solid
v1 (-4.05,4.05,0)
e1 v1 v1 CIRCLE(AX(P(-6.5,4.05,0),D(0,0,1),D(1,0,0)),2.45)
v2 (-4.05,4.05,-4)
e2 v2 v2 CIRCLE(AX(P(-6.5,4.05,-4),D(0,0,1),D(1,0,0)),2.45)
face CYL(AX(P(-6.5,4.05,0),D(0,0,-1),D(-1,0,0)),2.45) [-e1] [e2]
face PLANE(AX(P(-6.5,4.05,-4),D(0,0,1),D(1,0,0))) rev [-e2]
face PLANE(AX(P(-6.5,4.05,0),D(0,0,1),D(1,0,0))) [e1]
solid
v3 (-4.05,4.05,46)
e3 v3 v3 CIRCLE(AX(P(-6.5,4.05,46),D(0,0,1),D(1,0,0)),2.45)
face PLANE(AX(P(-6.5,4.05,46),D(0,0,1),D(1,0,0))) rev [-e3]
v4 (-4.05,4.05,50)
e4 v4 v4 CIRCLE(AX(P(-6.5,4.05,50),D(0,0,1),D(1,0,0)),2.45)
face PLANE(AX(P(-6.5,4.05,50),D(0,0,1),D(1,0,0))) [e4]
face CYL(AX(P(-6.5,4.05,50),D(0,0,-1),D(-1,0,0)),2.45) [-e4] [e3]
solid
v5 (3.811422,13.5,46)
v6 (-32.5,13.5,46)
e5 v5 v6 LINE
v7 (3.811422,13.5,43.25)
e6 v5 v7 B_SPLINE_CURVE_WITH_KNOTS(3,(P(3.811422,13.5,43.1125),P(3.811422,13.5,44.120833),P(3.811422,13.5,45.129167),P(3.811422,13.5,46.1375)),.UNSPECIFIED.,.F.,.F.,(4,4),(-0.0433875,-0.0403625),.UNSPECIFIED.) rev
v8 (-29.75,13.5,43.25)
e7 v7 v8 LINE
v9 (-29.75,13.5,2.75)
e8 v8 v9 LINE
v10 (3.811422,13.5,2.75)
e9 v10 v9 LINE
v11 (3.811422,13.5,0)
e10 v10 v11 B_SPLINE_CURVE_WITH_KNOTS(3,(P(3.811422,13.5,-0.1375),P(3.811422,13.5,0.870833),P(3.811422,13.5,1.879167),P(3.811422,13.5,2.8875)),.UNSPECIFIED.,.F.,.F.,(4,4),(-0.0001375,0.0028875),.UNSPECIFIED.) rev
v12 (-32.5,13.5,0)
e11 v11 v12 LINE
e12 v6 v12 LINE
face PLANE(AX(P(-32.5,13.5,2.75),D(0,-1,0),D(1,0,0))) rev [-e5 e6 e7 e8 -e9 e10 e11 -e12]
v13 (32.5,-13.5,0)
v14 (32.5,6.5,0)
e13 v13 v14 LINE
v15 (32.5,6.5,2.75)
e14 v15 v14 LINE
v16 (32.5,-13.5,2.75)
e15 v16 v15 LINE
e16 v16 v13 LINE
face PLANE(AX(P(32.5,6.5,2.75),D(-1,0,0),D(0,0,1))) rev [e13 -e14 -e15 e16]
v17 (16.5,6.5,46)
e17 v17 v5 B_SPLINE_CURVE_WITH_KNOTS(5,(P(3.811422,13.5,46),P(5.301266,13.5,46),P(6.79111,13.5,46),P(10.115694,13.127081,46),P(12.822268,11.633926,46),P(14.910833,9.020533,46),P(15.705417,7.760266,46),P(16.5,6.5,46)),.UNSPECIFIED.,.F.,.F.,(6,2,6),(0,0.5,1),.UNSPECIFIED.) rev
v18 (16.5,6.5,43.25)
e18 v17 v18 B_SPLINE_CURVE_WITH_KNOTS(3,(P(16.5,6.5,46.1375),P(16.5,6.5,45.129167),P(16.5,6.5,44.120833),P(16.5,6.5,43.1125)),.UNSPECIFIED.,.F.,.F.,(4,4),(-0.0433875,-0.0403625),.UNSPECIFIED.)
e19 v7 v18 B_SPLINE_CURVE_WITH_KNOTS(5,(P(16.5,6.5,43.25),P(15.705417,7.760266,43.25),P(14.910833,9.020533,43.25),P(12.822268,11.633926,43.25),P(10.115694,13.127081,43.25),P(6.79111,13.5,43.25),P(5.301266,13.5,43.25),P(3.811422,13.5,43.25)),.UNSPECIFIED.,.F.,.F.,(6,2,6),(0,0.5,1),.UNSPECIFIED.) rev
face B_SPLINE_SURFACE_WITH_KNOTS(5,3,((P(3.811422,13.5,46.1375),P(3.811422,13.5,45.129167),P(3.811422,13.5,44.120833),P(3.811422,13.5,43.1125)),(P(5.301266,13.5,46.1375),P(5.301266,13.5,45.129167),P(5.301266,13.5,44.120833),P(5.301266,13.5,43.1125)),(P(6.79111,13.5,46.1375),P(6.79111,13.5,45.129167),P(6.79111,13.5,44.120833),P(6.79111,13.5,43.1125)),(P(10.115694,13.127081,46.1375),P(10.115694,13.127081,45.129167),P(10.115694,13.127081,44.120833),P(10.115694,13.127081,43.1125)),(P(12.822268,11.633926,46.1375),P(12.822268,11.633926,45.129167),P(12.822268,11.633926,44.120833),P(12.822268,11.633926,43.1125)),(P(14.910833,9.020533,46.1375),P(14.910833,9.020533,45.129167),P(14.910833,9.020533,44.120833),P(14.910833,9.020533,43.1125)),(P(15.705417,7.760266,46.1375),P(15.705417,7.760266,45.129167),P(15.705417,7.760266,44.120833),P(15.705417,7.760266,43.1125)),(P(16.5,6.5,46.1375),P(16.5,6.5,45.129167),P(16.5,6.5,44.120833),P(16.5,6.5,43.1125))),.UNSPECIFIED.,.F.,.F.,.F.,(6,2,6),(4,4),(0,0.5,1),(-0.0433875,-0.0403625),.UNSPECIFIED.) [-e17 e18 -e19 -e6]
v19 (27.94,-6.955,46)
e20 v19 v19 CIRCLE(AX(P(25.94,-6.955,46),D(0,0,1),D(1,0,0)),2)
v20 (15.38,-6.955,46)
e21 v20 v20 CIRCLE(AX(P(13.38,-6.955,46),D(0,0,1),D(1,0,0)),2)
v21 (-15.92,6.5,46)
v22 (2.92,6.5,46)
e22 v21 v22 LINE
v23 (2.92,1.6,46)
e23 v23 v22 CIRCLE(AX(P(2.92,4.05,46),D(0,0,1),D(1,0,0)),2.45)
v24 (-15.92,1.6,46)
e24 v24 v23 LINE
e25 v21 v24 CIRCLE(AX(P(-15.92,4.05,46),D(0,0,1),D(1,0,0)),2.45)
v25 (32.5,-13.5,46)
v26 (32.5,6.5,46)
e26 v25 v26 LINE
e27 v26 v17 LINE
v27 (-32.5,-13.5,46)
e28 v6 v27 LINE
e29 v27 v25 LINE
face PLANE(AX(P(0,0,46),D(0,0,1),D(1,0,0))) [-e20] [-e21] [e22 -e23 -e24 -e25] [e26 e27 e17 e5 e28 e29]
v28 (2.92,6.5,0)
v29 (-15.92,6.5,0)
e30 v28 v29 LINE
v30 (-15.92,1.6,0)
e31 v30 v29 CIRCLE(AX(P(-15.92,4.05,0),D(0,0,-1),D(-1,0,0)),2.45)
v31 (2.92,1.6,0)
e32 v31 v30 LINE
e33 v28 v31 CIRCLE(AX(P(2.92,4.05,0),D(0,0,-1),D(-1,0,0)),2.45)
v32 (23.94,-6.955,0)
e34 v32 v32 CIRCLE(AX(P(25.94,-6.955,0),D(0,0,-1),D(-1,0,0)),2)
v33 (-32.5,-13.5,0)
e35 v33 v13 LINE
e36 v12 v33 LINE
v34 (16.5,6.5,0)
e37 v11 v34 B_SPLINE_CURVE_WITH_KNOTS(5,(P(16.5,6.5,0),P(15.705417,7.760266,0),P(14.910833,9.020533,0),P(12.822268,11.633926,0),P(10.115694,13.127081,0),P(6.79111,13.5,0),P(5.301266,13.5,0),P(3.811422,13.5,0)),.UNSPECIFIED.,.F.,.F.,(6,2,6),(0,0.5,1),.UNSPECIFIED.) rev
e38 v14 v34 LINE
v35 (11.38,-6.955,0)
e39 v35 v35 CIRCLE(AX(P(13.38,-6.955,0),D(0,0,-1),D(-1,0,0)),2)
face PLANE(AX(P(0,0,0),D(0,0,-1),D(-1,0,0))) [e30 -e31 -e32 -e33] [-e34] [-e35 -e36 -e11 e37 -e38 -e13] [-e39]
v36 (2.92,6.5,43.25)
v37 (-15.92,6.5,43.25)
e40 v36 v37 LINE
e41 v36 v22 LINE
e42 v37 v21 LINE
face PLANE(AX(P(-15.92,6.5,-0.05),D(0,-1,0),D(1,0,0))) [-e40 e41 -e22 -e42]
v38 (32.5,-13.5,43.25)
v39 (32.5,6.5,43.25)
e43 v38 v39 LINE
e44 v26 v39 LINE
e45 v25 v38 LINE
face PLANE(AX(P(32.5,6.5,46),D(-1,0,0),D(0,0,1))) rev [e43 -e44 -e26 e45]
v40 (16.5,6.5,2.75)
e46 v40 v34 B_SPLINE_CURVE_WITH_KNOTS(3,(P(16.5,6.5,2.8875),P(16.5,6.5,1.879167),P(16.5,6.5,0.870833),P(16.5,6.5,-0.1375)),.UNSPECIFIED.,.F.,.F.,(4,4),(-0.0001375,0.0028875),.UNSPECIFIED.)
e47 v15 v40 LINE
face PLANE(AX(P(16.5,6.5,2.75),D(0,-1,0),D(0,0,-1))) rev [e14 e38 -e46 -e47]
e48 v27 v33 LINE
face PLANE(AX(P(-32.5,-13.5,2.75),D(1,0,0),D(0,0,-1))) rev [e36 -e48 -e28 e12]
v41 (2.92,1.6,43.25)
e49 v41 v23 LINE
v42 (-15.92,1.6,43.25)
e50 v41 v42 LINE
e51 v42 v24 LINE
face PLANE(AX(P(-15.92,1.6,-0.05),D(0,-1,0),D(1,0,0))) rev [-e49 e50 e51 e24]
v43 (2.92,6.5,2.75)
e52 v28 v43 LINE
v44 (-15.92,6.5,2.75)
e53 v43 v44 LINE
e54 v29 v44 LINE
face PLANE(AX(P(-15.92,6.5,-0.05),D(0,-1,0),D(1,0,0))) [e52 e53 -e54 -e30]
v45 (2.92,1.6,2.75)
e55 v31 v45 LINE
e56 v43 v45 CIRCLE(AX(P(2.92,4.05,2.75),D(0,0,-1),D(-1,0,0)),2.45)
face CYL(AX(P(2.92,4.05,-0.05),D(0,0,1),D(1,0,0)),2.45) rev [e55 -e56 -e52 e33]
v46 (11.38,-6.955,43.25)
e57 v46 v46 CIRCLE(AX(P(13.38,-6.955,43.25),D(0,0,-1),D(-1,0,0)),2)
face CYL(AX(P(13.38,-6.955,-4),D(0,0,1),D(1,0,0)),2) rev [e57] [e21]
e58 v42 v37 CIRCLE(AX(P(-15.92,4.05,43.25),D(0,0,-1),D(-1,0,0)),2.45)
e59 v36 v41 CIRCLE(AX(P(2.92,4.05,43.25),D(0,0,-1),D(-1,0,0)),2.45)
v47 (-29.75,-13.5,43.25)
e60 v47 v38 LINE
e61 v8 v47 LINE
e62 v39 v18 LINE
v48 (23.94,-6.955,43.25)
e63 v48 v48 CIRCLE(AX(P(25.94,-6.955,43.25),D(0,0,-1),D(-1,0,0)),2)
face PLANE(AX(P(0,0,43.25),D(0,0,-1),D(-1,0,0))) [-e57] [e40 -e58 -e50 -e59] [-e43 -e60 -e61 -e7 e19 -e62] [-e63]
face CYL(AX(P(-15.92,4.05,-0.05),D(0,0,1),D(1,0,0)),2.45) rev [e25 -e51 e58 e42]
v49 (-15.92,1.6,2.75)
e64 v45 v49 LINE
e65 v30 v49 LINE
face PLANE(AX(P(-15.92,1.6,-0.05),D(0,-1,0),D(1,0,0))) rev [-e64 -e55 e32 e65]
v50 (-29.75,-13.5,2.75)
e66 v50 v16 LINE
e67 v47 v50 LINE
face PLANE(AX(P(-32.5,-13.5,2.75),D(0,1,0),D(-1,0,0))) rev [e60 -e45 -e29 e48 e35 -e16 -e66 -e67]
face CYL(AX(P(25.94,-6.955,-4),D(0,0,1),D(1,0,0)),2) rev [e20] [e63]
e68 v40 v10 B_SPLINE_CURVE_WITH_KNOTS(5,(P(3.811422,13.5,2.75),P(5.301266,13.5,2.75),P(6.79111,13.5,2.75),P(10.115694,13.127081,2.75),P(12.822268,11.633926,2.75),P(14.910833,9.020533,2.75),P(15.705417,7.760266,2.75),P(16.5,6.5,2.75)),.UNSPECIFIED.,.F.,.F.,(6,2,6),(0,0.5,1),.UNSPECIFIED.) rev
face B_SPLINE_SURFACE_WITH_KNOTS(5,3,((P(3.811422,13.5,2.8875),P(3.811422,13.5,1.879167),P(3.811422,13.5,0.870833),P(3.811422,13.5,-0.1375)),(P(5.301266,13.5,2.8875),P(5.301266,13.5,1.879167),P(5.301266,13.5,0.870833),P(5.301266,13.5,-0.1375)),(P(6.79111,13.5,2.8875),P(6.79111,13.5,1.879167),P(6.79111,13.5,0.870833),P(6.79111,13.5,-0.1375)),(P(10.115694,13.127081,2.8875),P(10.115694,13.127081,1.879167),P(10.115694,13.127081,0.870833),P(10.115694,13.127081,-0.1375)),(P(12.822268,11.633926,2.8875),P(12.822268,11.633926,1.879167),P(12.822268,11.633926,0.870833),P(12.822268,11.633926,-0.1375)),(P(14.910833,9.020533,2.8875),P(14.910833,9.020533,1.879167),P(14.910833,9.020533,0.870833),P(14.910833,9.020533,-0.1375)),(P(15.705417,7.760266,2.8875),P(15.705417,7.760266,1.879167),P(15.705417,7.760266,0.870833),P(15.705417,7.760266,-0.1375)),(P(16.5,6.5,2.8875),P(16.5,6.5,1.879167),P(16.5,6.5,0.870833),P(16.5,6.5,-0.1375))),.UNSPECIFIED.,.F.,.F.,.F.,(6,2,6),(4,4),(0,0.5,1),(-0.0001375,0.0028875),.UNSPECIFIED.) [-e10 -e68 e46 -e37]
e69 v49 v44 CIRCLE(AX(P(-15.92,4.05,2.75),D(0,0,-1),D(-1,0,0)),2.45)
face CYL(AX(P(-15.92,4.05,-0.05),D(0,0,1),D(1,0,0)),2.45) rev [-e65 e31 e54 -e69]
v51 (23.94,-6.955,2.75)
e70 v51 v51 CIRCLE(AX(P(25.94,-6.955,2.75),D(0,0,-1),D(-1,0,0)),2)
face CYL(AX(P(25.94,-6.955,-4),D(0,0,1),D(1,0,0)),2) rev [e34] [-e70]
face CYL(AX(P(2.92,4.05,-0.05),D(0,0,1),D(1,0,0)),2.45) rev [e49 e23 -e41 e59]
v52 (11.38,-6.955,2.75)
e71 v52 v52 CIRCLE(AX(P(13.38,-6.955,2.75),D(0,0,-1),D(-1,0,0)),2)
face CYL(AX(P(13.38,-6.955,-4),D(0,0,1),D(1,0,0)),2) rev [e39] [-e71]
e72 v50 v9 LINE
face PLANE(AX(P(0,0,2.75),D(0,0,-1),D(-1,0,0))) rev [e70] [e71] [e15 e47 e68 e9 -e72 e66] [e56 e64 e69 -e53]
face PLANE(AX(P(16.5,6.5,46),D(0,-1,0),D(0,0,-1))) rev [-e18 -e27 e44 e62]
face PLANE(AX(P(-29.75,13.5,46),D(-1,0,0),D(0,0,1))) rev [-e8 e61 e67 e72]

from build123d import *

# Parameters (mm, degrees)
BOSS_EXTRUDE1_DEPTH     = 2.75
FILLET1_START           = -1
FILLET1_DEPTH           = 5
CUT_EXTRUDE1_DEPTH      = 36.299610618
SKETCH4_W               = 2.75
SKETCH4_H               = 27
BOSS_EXTRUDE2_DEPTH     = 43.25
LPATTERN2_COUNT         = 2
LPATTERN2_PITCH         = 43.25
LPATTERN3_START         = 43.25
LPATTERN3_DEPTH         = 2.75
SKETCH6_R               = 2.45
BOSS_EXTRUDE3_DEPTH     = 4
LPATTERN4_COUNT         = 2
LPATTERN4_PITCH         = 50
CUT_EXTRUDE2_DEPTH      = 62.14327444
CUT_EXTRUDE2_DEPTH_BACK = 62.14327444
SKETCH7_R               = 2
FILLET3_START           = 43.25
FILLET3_DEPTH           = 3.75


with BuildPart() as part:
    # Sketch1 → Boss-Extrude1 (new body)
    with BuildSketch(Plane.XY):
        Polygon((-32.5, -13.5), (32.5, -13.5), (32.5, 6.5), (16.5, 6.5), (16.5, 13.5), (-32.5, 13.5), align=None)
    boss_extrude1 = extrude(amount=BOSS_EXTRUDE1_DEPTH)

    # Fillet1: read off the stored shape, not the designer's step
    # Fillet1 outline → Fillet1 (cut)
    with BuildSketch(Plane.XY.offset(FILLET1_START)):
        with BuildLine():
            Line((16.5, 13.5), (3.81142246, 13.5))
            add(Edge.make_bspline(
                [(3.81142246, 13.5), (5.301266164, 13.5), (6.791109869, 13.5), (10.115693614, 13.127081209), (12.822268118, 11.633925537), (14.910833382, 9.020532983), (15.705416691, 7.760266491), (16.5, 6.5)],
                knots=[0, 0, 0, 0, 0, 0, 0.5, 0.5, 1, 1, 1, 1, 1, 1], degree=5))
            Line((16.5, 6.5), (16.5, 13.5))
        make_face()
    extrude(amount=FILLET1_DEPTH, mode=Mode.SUBTRACT)

    # Sketch2 → Cut-Extrude1 (cut, symmetric)
    with BuildSketch(Plane.XY.offset(2.75)):
        with BuildLine():
            Line((-15.92, 1.6), (2.92, 1.6))
            ThreePointArc((2.92, 1.6), (5.37, 4.05), (2.92, 6.5))
            Line((2.92, 6.5), (-15.92, 6.5))
            ThreePointArc((-15.92, 6.5), (-18.37, 4.05), (-15.92, 1.6))
        make_face()
    extrude(amount=CUT_EXTRUDE1_DEPTH, both=True, mode=Mode.SUBTRACT)

    # Sketch4 → Boss-Extrude2 (add)
    with BuildSketch(Plane.XY.offset(2.75)):
        with Locations((-31.125, 0)):
            Rectangle(SKETCH4_W, SKETCH4_H)
    extrude(amount=BOSS_EXTRUDE2_DEPTH)

    # LPattern2: Boss-Extrude1 ×2
    with Locations(*[(0, 0, i * LPATTERN2_PITCH) for i in range(1, LPATTERN2_COUNT)]):
        add(boss_extrude1)

    # LPattern3: read off the stored shape, not the designer's step
    # LPattern3 outline → LPattern3 (cut)
    with BuildSketch(Plane.XY.offset(LPATTERN3_START)):
        with BuildLine():
            Line((2.92, 6.5), (-15.92, 6.5))
            ThreePointArc((-15.92, 6.5), (-18.37, 4.05), (-15.92, 1.6))
            Line((-15.92, 1.6), (2.92, 1.6))
            ThreePointArc((2.92, 1.6), (5.37, 4.05), (2.92, 6.5))
        make_face()
    extrude(amount=LPATTERN3_DEPTH, mode=Mode.SUBTRACT)

    # Sketch7 → Cut-Extrude2 (cut, two sides: drawn at the far end of the back side and taken through both)
    with BuildSketch(Plane.XY.offset(46).offset(-CUT_EXTRUDE2_DEPTH_BACK)):
        with Locations(Location((13.38, -6.955, 0), (0, 0, 180))):
            Circle(SKETCH7_R)
        with Locations(Location((25.94, -6.955, 0), (0, 0, 180))):
            Circle(SKETCH7_R)
    extrude(amount=CUT_EXTRUDE2_DEPTH + CUT_EXTRUDE2_DEPTH_BACK, mode=Mode.SUBTRACT)

    # Fillet3: read off the stored shape, not the designer's step
    # Fillet3 outline → Fillet3 (cut)
    with BuildSketch(Plane.XY.offset(FILLET3_START)):
        with BuildLine():
            Line((16.5, 13.5), (3.81142246, 13.5))
            add(Edge.make_bspline(
                [(3.81142246, 13.5), (5.301266164, 13.5), (6.791109869, 13.5), (10.115693614, 13.127081209), (12.822268118, 11.633925537), (14.910833382, 9.020532983), (15.705416691, 7.760266491), (16.5, 6.5)],
                knots=[0, 0, 0, 0, 0, 0, 0.5, 0.5, 1, 1, 1, 1, 1, 1], degree=5))
            Line((16.5, 6.5), (16.5, 13.5))
        make_face()
    extrude(amount=FILLET3_DEPTH, mode=Mode.SUBTRACT)


with BuildPart() as body_2:
    # Sketch6 → Boss-Extrude3 (new body)
    with BuildSketch(Plane.XY.offset(46)):
        with Locations((-6.5, 4.05)):
            Circle(SKETCH6_R)
    boss_extrude3 = extrude(amount=BOSS_EXTRUDE3_DEPTH)


with BuildPart() as lpattern4_1:
    # LPattern4: Boss-Extrude3 ×2
    with Locations(*[(0, 0, -i * LPATTERN4_PITCH) for i in range(1, LPATTERN4_COUNT)]):
        add(boss_extrude3)


solid = Compound([part.part, body_2.part, lpattern4_1.part])
